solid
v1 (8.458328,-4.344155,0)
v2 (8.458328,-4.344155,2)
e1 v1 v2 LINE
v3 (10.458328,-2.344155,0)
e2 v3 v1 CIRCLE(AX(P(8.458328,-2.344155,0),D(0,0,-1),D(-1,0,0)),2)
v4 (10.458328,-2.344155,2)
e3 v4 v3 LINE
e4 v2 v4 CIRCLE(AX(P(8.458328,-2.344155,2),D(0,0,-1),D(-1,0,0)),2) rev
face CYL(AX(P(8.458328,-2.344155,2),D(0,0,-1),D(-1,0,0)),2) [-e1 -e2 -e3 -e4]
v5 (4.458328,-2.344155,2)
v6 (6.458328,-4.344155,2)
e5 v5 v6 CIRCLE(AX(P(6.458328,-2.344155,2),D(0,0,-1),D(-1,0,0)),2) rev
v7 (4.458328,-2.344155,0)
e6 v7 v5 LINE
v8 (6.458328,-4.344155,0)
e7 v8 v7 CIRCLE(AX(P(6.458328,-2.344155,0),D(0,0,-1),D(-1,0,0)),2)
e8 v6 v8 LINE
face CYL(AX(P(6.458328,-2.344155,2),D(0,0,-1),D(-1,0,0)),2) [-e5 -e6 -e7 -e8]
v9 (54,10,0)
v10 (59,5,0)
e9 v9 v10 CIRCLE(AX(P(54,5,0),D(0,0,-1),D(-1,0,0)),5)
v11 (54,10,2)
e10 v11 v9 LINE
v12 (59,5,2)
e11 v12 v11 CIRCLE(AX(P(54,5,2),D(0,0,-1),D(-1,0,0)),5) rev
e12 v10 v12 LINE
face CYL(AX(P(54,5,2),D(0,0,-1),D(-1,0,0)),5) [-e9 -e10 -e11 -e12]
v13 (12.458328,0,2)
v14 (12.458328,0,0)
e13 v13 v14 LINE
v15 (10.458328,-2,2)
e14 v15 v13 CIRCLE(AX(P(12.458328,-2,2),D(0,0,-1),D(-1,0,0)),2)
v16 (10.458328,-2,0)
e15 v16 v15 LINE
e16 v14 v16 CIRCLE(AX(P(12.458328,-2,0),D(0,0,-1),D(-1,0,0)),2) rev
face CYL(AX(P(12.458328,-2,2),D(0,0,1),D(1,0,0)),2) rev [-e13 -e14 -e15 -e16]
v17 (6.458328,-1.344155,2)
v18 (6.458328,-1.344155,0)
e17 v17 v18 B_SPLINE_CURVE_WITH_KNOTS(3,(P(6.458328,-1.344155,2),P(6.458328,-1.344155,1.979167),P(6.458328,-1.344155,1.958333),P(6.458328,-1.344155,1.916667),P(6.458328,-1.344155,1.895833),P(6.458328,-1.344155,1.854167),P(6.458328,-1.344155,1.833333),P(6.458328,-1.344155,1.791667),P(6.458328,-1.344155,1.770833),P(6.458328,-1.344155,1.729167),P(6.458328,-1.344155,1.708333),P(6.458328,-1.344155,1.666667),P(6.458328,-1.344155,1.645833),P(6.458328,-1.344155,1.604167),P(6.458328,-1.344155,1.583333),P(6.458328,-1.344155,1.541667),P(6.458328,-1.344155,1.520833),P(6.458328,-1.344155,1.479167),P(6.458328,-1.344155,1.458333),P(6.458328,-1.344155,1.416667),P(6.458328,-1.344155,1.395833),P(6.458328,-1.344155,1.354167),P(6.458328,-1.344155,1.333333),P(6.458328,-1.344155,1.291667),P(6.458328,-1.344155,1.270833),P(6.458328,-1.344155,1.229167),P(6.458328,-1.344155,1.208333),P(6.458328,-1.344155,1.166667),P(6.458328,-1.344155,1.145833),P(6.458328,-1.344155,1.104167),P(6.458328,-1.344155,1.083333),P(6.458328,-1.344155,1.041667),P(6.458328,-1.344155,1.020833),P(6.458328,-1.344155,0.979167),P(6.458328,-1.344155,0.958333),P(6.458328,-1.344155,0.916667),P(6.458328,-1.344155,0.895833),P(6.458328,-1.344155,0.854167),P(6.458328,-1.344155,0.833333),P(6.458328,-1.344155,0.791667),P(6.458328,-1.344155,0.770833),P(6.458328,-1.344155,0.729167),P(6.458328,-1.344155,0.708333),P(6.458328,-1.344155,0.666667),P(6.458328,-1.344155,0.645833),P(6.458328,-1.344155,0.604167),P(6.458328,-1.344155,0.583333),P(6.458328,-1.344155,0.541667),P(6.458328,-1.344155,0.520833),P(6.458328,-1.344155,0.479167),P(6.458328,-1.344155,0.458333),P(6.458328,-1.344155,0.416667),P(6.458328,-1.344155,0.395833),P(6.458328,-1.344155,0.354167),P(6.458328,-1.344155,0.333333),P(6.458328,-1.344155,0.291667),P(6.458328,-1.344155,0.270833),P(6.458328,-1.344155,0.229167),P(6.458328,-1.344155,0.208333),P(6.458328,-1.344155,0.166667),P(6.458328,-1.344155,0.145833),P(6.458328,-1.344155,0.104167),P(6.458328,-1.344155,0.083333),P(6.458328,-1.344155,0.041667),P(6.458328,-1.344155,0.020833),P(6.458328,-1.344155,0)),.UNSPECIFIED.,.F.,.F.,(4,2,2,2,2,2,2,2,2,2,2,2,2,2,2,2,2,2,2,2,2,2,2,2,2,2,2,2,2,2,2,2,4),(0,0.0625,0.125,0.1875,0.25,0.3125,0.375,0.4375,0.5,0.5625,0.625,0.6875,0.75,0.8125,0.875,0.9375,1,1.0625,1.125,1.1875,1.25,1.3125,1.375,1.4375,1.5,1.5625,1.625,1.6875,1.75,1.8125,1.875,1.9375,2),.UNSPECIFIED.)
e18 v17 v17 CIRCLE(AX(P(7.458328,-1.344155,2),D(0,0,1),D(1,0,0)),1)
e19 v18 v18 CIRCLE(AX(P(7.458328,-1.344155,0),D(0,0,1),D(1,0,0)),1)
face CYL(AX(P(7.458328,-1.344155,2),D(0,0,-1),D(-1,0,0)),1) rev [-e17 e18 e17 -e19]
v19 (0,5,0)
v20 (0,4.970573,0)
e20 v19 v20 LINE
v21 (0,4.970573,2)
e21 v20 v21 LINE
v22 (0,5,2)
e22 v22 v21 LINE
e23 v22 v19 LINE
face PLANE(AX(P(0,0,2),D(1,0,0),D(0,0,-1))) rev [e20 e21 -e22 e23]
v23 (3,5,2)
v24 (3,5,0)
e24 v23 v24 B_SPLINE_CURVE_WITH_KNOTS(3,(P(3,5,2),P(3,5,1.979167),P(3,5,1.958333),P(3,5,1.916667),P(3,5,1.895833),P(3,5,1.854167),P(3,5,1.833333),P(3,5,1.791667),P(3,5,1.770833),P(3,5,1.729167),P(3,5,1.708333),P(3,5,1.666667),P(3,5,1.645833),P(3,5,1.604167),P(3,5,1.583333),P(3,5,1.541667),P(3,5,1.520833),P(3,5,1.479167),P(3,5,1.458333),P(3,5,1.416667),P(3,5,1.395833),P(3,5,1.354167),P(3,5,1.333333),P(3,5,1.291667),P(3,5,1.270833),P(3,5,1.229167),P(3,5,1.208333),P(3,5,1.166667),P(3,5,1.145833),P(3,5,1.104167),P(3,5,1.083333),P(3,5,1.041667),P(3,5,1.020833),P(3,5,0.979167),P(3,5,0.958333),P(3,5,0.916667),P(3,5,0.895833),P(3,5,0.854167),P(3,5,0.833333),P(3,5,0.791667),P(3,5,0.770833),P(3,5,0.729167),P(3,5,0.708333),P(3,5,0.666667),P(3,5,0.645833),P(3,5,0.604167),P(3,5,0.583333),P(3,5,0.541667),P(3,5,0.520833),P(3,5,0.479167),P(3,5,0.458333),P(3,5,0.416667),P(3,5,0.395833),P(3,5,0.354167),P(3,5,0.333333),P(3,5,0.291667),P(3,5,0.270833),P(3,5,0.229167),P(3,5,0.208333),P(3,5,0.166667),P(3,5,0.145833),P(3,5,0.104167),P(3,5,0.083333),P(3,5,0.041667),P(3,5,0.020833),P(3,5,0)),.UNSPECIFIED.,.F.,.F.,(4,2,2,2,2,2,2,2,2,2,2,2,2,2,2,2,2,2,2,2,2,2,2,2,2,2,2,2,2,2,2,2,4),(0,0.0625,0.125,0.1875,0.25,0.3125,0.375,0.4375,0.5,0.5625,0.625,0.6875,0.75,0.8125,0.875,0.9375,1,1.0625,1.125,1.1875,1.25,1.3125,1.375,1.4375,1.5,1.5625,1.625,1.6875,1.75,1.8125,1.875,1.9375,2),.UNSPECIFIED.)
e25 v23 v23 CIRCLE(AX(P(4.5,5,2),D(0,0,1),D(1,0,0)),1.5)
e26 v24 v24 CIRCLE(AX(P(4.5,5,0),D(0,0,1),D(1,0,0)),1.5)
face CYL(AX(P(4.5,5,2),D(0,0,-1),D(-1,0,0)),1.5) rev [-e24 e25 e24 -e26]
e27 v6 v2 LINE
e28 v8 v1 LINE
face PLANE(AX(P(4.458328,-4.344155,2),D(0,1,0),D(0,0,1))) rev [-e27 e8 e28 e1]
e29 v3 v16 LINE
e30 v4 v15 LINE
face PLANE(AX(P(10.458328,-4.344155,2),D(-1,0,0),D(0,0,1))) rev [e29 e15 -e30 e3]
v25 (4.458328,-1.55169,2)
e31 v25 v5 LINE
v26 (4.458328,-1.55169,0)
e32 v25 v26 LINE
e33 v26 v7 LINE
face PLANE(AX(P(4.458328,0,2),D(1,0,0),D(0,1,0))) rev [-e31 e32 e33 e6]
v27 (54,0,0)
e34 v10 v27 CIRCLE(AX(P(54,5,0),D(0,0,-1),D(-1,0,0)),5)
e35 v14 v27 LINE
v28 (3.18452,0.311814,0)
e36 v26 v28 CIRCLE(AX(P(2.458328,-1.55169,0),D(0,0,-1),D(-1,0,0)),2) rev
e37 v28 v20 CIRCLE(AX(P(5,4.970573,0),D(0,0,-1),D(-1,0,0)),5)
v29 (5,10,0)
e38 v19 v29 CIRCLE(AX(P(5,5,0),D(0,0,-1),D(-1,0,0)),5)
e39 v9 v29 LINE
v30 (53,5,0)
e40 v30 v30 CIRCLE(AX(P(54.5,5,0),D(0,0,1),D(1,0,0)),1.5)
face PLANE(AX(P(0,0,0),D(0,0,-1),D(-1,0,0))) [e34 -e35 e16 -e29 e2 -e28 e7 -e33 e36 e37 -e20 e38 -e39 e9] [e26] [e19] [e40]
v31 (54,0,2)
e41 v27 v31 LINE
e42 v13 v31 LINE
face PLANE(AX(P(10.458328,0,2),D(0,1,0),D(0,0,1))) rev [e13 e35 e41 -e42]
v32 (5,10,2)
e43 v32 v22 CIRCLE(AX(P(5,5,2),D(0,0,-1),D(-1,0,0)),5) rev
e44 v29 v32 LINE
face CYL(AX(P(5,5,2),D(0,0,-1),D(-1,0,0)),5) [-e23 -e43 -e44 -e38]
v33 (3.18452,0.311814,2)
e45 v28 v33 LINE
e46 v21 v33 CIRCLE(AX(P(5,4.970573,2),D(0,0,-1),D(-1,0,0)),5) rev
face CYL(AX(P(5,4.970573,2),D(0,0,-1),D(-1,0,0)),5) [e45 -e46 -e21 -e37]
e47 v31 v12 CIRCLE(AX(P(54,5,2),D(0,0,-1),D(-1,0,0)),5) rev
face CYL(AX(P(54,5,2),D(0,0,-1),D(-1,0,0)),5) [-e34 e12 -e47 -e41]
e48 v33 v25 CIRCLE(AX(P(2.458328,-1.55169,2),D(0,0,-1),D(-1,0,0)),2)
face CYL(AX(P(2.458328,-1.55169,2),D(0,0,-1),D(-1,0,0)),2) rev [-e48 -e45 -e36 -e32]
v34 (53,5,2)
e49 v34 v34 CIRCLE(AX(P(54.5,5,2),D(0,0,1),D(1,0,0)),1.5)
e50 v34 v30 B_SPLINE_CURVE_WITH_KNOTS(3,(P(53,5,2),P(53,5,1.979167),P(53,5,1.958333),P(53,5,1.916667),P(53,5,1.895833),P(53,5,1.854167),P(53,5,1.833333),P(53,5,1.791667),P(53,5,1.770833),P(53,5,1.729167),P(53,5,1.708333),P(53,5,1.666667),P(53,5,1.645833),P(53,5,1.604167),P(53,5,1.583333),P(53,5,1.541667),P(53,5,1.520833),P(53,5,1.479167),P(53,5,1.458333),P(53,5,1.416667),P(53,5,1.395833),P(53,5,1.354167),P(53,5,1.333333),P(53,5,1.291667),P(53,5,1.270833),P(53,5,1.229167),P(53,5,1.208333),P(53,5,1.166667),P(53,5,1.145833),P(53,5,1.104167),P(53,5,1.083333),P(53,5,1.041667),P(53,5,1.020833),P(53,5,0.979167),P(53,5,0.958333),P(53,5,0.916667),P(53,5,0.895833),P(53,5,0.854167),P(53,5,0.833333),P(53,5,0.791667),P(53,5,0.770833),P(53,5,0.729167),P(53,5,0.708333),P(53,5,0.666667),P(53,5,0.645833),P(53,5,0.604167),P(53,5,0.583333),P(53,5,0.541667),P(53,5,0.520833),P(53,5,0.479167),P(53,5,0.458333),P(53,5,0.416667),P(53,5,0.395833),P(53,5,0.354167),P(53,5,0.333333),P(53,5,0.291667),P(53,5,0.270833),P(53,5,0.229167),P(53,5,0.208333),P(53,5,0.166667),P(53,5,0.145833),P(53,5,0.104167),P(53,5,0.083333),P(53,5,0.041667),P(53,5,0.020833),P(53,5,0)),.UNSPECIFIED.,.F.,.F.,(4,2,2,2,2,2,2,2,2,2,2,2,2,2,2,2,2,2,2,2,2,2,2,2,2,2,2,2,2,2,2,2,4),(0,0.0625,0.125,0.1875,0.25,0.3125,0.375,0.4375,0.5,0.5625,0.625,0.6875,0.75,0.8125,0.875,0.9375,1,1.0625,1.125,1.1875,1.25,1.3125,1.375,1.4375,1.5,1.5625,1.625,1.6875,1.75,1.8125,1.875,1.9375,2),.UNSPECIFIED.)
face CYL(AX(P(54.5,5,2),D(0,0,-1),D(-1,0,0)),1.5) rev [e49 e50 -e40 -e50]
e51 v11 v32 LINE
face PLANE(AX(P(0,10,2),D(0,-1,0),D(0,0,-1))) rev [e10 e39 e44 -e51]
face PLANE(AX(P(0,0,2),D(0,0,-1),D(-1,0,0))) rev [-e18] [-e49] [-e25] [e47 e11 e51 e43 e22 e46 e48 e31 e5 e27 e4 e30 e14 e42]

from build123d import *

# Parameters (mm, degrees)
SKETCH1_R           = 1.5
SKETCH1_R_2         = 1
BOSS_EXTRUDE1_DEPTH = 2
FILLET2_R           = 5
FILLET3_R           = 2


with BuildPart() as part:
    # Sketch1 → Boss-Extrude1 (new body)
    with BuildSketch(Plane.XY):
        Polygon((0, 0), (0, 10), (59, 10), (59, 0), (10.458327832, 0), (10.458327832, -4.344154509), (4.458327832, -4.344154509), (4.458327832, 0), align=None)
        with Locations((4.5, 5)):
            Circle(SKETCH1_R, mode=Mode.SUBTRACT)
        with Locations((54.5, 5)):
            Circle(SKETCH1_R, mode=Mode.SUBTRACT)
        with Locations((7.458327832, -1.344154509)):
            Circle(SKETCH1_R_2, mode=Mode.SUBTRACT)
    extrude(amount=BOSS_EXTRUDE1_DEPTH)

    # Fillet2
    # the kernel refuses this fillet: 5 mm, written as the material it takes off along each edge
    with BuildSketch(Plane(origin=(59, 0, -12.5), x_dir=(0, 1, 0), z_dir=(0, 0, 1)), Plane(origin=(59, 10, -12.5), x_dir=(-1, 0, 0), z_dir=(0, 0, 1)), Plane(origin=(0, 10, -12.5), x_dir=(0, -1, 0), z_dir=(0, 0, 1))) as fillet2_piece_1:
        with BuildLine():
            CenterArc((FILLET2_R, FILLET2_R), FILLET2_R, 180, 90)
            Line((0, FILLET2_R), (-FILLET2_R * 0.02, FILLET2_R))
            Line((-FILLET2_R * 0.02, FILLET2_R), (-FILLET2_R * 0.02, -FILLET2_R * 0.02))
            Line((-FILLET2_R * 0.02, -FILLET2_R * 0.02), (FILLET2_R, -FILLET2_R * 0.02))
            Line((FILLET2_R, -FILLET2_R * 0.02), (FILLET2_R, 0))
        make_face()
    extrude(amount=27, mode=Mode.SUBTRACT)
    with BuildSketch(Plane(origin=(0, 0, -12.426431322), x_dir=(0, 1, 0), z_dir=(0, 0, 1))) as fillet2_piece_2:
        with BuildLine():
            CenterArc((4.970572529, -5), FILLET2_R, 90, 83.780688145)
            Line((0, -4.458327832), (-0.099411451, -4.447494389))
            ThreePointArc((-0.099411451, -4.447494389), (-0.1, -2.229163916), (-0.1, 0))
            Line((-0.1, 0), (0, 0.1))
            Line((0, 0.1), (4.970572529, 0.1))
            Line((4.970572529, 0.1), (4.970572529, 0))
        make_face()
    extrude(amount=26.852862643, mode=Mode.SUBTRACT)

    # Fillet3
    fillet3_edges = [part.edges().sort_by_distance(p)[0] for p in [
        (10.458327832, 0, 1),
        (10.458327832, -4.344154509, 1),
        (4.458327832, -4.344154509, 1),
        (4.458327832, 0, 1),
    ]]
    fillet(fillet3_edges, radius=FILLET3_R)


solid = part.part
